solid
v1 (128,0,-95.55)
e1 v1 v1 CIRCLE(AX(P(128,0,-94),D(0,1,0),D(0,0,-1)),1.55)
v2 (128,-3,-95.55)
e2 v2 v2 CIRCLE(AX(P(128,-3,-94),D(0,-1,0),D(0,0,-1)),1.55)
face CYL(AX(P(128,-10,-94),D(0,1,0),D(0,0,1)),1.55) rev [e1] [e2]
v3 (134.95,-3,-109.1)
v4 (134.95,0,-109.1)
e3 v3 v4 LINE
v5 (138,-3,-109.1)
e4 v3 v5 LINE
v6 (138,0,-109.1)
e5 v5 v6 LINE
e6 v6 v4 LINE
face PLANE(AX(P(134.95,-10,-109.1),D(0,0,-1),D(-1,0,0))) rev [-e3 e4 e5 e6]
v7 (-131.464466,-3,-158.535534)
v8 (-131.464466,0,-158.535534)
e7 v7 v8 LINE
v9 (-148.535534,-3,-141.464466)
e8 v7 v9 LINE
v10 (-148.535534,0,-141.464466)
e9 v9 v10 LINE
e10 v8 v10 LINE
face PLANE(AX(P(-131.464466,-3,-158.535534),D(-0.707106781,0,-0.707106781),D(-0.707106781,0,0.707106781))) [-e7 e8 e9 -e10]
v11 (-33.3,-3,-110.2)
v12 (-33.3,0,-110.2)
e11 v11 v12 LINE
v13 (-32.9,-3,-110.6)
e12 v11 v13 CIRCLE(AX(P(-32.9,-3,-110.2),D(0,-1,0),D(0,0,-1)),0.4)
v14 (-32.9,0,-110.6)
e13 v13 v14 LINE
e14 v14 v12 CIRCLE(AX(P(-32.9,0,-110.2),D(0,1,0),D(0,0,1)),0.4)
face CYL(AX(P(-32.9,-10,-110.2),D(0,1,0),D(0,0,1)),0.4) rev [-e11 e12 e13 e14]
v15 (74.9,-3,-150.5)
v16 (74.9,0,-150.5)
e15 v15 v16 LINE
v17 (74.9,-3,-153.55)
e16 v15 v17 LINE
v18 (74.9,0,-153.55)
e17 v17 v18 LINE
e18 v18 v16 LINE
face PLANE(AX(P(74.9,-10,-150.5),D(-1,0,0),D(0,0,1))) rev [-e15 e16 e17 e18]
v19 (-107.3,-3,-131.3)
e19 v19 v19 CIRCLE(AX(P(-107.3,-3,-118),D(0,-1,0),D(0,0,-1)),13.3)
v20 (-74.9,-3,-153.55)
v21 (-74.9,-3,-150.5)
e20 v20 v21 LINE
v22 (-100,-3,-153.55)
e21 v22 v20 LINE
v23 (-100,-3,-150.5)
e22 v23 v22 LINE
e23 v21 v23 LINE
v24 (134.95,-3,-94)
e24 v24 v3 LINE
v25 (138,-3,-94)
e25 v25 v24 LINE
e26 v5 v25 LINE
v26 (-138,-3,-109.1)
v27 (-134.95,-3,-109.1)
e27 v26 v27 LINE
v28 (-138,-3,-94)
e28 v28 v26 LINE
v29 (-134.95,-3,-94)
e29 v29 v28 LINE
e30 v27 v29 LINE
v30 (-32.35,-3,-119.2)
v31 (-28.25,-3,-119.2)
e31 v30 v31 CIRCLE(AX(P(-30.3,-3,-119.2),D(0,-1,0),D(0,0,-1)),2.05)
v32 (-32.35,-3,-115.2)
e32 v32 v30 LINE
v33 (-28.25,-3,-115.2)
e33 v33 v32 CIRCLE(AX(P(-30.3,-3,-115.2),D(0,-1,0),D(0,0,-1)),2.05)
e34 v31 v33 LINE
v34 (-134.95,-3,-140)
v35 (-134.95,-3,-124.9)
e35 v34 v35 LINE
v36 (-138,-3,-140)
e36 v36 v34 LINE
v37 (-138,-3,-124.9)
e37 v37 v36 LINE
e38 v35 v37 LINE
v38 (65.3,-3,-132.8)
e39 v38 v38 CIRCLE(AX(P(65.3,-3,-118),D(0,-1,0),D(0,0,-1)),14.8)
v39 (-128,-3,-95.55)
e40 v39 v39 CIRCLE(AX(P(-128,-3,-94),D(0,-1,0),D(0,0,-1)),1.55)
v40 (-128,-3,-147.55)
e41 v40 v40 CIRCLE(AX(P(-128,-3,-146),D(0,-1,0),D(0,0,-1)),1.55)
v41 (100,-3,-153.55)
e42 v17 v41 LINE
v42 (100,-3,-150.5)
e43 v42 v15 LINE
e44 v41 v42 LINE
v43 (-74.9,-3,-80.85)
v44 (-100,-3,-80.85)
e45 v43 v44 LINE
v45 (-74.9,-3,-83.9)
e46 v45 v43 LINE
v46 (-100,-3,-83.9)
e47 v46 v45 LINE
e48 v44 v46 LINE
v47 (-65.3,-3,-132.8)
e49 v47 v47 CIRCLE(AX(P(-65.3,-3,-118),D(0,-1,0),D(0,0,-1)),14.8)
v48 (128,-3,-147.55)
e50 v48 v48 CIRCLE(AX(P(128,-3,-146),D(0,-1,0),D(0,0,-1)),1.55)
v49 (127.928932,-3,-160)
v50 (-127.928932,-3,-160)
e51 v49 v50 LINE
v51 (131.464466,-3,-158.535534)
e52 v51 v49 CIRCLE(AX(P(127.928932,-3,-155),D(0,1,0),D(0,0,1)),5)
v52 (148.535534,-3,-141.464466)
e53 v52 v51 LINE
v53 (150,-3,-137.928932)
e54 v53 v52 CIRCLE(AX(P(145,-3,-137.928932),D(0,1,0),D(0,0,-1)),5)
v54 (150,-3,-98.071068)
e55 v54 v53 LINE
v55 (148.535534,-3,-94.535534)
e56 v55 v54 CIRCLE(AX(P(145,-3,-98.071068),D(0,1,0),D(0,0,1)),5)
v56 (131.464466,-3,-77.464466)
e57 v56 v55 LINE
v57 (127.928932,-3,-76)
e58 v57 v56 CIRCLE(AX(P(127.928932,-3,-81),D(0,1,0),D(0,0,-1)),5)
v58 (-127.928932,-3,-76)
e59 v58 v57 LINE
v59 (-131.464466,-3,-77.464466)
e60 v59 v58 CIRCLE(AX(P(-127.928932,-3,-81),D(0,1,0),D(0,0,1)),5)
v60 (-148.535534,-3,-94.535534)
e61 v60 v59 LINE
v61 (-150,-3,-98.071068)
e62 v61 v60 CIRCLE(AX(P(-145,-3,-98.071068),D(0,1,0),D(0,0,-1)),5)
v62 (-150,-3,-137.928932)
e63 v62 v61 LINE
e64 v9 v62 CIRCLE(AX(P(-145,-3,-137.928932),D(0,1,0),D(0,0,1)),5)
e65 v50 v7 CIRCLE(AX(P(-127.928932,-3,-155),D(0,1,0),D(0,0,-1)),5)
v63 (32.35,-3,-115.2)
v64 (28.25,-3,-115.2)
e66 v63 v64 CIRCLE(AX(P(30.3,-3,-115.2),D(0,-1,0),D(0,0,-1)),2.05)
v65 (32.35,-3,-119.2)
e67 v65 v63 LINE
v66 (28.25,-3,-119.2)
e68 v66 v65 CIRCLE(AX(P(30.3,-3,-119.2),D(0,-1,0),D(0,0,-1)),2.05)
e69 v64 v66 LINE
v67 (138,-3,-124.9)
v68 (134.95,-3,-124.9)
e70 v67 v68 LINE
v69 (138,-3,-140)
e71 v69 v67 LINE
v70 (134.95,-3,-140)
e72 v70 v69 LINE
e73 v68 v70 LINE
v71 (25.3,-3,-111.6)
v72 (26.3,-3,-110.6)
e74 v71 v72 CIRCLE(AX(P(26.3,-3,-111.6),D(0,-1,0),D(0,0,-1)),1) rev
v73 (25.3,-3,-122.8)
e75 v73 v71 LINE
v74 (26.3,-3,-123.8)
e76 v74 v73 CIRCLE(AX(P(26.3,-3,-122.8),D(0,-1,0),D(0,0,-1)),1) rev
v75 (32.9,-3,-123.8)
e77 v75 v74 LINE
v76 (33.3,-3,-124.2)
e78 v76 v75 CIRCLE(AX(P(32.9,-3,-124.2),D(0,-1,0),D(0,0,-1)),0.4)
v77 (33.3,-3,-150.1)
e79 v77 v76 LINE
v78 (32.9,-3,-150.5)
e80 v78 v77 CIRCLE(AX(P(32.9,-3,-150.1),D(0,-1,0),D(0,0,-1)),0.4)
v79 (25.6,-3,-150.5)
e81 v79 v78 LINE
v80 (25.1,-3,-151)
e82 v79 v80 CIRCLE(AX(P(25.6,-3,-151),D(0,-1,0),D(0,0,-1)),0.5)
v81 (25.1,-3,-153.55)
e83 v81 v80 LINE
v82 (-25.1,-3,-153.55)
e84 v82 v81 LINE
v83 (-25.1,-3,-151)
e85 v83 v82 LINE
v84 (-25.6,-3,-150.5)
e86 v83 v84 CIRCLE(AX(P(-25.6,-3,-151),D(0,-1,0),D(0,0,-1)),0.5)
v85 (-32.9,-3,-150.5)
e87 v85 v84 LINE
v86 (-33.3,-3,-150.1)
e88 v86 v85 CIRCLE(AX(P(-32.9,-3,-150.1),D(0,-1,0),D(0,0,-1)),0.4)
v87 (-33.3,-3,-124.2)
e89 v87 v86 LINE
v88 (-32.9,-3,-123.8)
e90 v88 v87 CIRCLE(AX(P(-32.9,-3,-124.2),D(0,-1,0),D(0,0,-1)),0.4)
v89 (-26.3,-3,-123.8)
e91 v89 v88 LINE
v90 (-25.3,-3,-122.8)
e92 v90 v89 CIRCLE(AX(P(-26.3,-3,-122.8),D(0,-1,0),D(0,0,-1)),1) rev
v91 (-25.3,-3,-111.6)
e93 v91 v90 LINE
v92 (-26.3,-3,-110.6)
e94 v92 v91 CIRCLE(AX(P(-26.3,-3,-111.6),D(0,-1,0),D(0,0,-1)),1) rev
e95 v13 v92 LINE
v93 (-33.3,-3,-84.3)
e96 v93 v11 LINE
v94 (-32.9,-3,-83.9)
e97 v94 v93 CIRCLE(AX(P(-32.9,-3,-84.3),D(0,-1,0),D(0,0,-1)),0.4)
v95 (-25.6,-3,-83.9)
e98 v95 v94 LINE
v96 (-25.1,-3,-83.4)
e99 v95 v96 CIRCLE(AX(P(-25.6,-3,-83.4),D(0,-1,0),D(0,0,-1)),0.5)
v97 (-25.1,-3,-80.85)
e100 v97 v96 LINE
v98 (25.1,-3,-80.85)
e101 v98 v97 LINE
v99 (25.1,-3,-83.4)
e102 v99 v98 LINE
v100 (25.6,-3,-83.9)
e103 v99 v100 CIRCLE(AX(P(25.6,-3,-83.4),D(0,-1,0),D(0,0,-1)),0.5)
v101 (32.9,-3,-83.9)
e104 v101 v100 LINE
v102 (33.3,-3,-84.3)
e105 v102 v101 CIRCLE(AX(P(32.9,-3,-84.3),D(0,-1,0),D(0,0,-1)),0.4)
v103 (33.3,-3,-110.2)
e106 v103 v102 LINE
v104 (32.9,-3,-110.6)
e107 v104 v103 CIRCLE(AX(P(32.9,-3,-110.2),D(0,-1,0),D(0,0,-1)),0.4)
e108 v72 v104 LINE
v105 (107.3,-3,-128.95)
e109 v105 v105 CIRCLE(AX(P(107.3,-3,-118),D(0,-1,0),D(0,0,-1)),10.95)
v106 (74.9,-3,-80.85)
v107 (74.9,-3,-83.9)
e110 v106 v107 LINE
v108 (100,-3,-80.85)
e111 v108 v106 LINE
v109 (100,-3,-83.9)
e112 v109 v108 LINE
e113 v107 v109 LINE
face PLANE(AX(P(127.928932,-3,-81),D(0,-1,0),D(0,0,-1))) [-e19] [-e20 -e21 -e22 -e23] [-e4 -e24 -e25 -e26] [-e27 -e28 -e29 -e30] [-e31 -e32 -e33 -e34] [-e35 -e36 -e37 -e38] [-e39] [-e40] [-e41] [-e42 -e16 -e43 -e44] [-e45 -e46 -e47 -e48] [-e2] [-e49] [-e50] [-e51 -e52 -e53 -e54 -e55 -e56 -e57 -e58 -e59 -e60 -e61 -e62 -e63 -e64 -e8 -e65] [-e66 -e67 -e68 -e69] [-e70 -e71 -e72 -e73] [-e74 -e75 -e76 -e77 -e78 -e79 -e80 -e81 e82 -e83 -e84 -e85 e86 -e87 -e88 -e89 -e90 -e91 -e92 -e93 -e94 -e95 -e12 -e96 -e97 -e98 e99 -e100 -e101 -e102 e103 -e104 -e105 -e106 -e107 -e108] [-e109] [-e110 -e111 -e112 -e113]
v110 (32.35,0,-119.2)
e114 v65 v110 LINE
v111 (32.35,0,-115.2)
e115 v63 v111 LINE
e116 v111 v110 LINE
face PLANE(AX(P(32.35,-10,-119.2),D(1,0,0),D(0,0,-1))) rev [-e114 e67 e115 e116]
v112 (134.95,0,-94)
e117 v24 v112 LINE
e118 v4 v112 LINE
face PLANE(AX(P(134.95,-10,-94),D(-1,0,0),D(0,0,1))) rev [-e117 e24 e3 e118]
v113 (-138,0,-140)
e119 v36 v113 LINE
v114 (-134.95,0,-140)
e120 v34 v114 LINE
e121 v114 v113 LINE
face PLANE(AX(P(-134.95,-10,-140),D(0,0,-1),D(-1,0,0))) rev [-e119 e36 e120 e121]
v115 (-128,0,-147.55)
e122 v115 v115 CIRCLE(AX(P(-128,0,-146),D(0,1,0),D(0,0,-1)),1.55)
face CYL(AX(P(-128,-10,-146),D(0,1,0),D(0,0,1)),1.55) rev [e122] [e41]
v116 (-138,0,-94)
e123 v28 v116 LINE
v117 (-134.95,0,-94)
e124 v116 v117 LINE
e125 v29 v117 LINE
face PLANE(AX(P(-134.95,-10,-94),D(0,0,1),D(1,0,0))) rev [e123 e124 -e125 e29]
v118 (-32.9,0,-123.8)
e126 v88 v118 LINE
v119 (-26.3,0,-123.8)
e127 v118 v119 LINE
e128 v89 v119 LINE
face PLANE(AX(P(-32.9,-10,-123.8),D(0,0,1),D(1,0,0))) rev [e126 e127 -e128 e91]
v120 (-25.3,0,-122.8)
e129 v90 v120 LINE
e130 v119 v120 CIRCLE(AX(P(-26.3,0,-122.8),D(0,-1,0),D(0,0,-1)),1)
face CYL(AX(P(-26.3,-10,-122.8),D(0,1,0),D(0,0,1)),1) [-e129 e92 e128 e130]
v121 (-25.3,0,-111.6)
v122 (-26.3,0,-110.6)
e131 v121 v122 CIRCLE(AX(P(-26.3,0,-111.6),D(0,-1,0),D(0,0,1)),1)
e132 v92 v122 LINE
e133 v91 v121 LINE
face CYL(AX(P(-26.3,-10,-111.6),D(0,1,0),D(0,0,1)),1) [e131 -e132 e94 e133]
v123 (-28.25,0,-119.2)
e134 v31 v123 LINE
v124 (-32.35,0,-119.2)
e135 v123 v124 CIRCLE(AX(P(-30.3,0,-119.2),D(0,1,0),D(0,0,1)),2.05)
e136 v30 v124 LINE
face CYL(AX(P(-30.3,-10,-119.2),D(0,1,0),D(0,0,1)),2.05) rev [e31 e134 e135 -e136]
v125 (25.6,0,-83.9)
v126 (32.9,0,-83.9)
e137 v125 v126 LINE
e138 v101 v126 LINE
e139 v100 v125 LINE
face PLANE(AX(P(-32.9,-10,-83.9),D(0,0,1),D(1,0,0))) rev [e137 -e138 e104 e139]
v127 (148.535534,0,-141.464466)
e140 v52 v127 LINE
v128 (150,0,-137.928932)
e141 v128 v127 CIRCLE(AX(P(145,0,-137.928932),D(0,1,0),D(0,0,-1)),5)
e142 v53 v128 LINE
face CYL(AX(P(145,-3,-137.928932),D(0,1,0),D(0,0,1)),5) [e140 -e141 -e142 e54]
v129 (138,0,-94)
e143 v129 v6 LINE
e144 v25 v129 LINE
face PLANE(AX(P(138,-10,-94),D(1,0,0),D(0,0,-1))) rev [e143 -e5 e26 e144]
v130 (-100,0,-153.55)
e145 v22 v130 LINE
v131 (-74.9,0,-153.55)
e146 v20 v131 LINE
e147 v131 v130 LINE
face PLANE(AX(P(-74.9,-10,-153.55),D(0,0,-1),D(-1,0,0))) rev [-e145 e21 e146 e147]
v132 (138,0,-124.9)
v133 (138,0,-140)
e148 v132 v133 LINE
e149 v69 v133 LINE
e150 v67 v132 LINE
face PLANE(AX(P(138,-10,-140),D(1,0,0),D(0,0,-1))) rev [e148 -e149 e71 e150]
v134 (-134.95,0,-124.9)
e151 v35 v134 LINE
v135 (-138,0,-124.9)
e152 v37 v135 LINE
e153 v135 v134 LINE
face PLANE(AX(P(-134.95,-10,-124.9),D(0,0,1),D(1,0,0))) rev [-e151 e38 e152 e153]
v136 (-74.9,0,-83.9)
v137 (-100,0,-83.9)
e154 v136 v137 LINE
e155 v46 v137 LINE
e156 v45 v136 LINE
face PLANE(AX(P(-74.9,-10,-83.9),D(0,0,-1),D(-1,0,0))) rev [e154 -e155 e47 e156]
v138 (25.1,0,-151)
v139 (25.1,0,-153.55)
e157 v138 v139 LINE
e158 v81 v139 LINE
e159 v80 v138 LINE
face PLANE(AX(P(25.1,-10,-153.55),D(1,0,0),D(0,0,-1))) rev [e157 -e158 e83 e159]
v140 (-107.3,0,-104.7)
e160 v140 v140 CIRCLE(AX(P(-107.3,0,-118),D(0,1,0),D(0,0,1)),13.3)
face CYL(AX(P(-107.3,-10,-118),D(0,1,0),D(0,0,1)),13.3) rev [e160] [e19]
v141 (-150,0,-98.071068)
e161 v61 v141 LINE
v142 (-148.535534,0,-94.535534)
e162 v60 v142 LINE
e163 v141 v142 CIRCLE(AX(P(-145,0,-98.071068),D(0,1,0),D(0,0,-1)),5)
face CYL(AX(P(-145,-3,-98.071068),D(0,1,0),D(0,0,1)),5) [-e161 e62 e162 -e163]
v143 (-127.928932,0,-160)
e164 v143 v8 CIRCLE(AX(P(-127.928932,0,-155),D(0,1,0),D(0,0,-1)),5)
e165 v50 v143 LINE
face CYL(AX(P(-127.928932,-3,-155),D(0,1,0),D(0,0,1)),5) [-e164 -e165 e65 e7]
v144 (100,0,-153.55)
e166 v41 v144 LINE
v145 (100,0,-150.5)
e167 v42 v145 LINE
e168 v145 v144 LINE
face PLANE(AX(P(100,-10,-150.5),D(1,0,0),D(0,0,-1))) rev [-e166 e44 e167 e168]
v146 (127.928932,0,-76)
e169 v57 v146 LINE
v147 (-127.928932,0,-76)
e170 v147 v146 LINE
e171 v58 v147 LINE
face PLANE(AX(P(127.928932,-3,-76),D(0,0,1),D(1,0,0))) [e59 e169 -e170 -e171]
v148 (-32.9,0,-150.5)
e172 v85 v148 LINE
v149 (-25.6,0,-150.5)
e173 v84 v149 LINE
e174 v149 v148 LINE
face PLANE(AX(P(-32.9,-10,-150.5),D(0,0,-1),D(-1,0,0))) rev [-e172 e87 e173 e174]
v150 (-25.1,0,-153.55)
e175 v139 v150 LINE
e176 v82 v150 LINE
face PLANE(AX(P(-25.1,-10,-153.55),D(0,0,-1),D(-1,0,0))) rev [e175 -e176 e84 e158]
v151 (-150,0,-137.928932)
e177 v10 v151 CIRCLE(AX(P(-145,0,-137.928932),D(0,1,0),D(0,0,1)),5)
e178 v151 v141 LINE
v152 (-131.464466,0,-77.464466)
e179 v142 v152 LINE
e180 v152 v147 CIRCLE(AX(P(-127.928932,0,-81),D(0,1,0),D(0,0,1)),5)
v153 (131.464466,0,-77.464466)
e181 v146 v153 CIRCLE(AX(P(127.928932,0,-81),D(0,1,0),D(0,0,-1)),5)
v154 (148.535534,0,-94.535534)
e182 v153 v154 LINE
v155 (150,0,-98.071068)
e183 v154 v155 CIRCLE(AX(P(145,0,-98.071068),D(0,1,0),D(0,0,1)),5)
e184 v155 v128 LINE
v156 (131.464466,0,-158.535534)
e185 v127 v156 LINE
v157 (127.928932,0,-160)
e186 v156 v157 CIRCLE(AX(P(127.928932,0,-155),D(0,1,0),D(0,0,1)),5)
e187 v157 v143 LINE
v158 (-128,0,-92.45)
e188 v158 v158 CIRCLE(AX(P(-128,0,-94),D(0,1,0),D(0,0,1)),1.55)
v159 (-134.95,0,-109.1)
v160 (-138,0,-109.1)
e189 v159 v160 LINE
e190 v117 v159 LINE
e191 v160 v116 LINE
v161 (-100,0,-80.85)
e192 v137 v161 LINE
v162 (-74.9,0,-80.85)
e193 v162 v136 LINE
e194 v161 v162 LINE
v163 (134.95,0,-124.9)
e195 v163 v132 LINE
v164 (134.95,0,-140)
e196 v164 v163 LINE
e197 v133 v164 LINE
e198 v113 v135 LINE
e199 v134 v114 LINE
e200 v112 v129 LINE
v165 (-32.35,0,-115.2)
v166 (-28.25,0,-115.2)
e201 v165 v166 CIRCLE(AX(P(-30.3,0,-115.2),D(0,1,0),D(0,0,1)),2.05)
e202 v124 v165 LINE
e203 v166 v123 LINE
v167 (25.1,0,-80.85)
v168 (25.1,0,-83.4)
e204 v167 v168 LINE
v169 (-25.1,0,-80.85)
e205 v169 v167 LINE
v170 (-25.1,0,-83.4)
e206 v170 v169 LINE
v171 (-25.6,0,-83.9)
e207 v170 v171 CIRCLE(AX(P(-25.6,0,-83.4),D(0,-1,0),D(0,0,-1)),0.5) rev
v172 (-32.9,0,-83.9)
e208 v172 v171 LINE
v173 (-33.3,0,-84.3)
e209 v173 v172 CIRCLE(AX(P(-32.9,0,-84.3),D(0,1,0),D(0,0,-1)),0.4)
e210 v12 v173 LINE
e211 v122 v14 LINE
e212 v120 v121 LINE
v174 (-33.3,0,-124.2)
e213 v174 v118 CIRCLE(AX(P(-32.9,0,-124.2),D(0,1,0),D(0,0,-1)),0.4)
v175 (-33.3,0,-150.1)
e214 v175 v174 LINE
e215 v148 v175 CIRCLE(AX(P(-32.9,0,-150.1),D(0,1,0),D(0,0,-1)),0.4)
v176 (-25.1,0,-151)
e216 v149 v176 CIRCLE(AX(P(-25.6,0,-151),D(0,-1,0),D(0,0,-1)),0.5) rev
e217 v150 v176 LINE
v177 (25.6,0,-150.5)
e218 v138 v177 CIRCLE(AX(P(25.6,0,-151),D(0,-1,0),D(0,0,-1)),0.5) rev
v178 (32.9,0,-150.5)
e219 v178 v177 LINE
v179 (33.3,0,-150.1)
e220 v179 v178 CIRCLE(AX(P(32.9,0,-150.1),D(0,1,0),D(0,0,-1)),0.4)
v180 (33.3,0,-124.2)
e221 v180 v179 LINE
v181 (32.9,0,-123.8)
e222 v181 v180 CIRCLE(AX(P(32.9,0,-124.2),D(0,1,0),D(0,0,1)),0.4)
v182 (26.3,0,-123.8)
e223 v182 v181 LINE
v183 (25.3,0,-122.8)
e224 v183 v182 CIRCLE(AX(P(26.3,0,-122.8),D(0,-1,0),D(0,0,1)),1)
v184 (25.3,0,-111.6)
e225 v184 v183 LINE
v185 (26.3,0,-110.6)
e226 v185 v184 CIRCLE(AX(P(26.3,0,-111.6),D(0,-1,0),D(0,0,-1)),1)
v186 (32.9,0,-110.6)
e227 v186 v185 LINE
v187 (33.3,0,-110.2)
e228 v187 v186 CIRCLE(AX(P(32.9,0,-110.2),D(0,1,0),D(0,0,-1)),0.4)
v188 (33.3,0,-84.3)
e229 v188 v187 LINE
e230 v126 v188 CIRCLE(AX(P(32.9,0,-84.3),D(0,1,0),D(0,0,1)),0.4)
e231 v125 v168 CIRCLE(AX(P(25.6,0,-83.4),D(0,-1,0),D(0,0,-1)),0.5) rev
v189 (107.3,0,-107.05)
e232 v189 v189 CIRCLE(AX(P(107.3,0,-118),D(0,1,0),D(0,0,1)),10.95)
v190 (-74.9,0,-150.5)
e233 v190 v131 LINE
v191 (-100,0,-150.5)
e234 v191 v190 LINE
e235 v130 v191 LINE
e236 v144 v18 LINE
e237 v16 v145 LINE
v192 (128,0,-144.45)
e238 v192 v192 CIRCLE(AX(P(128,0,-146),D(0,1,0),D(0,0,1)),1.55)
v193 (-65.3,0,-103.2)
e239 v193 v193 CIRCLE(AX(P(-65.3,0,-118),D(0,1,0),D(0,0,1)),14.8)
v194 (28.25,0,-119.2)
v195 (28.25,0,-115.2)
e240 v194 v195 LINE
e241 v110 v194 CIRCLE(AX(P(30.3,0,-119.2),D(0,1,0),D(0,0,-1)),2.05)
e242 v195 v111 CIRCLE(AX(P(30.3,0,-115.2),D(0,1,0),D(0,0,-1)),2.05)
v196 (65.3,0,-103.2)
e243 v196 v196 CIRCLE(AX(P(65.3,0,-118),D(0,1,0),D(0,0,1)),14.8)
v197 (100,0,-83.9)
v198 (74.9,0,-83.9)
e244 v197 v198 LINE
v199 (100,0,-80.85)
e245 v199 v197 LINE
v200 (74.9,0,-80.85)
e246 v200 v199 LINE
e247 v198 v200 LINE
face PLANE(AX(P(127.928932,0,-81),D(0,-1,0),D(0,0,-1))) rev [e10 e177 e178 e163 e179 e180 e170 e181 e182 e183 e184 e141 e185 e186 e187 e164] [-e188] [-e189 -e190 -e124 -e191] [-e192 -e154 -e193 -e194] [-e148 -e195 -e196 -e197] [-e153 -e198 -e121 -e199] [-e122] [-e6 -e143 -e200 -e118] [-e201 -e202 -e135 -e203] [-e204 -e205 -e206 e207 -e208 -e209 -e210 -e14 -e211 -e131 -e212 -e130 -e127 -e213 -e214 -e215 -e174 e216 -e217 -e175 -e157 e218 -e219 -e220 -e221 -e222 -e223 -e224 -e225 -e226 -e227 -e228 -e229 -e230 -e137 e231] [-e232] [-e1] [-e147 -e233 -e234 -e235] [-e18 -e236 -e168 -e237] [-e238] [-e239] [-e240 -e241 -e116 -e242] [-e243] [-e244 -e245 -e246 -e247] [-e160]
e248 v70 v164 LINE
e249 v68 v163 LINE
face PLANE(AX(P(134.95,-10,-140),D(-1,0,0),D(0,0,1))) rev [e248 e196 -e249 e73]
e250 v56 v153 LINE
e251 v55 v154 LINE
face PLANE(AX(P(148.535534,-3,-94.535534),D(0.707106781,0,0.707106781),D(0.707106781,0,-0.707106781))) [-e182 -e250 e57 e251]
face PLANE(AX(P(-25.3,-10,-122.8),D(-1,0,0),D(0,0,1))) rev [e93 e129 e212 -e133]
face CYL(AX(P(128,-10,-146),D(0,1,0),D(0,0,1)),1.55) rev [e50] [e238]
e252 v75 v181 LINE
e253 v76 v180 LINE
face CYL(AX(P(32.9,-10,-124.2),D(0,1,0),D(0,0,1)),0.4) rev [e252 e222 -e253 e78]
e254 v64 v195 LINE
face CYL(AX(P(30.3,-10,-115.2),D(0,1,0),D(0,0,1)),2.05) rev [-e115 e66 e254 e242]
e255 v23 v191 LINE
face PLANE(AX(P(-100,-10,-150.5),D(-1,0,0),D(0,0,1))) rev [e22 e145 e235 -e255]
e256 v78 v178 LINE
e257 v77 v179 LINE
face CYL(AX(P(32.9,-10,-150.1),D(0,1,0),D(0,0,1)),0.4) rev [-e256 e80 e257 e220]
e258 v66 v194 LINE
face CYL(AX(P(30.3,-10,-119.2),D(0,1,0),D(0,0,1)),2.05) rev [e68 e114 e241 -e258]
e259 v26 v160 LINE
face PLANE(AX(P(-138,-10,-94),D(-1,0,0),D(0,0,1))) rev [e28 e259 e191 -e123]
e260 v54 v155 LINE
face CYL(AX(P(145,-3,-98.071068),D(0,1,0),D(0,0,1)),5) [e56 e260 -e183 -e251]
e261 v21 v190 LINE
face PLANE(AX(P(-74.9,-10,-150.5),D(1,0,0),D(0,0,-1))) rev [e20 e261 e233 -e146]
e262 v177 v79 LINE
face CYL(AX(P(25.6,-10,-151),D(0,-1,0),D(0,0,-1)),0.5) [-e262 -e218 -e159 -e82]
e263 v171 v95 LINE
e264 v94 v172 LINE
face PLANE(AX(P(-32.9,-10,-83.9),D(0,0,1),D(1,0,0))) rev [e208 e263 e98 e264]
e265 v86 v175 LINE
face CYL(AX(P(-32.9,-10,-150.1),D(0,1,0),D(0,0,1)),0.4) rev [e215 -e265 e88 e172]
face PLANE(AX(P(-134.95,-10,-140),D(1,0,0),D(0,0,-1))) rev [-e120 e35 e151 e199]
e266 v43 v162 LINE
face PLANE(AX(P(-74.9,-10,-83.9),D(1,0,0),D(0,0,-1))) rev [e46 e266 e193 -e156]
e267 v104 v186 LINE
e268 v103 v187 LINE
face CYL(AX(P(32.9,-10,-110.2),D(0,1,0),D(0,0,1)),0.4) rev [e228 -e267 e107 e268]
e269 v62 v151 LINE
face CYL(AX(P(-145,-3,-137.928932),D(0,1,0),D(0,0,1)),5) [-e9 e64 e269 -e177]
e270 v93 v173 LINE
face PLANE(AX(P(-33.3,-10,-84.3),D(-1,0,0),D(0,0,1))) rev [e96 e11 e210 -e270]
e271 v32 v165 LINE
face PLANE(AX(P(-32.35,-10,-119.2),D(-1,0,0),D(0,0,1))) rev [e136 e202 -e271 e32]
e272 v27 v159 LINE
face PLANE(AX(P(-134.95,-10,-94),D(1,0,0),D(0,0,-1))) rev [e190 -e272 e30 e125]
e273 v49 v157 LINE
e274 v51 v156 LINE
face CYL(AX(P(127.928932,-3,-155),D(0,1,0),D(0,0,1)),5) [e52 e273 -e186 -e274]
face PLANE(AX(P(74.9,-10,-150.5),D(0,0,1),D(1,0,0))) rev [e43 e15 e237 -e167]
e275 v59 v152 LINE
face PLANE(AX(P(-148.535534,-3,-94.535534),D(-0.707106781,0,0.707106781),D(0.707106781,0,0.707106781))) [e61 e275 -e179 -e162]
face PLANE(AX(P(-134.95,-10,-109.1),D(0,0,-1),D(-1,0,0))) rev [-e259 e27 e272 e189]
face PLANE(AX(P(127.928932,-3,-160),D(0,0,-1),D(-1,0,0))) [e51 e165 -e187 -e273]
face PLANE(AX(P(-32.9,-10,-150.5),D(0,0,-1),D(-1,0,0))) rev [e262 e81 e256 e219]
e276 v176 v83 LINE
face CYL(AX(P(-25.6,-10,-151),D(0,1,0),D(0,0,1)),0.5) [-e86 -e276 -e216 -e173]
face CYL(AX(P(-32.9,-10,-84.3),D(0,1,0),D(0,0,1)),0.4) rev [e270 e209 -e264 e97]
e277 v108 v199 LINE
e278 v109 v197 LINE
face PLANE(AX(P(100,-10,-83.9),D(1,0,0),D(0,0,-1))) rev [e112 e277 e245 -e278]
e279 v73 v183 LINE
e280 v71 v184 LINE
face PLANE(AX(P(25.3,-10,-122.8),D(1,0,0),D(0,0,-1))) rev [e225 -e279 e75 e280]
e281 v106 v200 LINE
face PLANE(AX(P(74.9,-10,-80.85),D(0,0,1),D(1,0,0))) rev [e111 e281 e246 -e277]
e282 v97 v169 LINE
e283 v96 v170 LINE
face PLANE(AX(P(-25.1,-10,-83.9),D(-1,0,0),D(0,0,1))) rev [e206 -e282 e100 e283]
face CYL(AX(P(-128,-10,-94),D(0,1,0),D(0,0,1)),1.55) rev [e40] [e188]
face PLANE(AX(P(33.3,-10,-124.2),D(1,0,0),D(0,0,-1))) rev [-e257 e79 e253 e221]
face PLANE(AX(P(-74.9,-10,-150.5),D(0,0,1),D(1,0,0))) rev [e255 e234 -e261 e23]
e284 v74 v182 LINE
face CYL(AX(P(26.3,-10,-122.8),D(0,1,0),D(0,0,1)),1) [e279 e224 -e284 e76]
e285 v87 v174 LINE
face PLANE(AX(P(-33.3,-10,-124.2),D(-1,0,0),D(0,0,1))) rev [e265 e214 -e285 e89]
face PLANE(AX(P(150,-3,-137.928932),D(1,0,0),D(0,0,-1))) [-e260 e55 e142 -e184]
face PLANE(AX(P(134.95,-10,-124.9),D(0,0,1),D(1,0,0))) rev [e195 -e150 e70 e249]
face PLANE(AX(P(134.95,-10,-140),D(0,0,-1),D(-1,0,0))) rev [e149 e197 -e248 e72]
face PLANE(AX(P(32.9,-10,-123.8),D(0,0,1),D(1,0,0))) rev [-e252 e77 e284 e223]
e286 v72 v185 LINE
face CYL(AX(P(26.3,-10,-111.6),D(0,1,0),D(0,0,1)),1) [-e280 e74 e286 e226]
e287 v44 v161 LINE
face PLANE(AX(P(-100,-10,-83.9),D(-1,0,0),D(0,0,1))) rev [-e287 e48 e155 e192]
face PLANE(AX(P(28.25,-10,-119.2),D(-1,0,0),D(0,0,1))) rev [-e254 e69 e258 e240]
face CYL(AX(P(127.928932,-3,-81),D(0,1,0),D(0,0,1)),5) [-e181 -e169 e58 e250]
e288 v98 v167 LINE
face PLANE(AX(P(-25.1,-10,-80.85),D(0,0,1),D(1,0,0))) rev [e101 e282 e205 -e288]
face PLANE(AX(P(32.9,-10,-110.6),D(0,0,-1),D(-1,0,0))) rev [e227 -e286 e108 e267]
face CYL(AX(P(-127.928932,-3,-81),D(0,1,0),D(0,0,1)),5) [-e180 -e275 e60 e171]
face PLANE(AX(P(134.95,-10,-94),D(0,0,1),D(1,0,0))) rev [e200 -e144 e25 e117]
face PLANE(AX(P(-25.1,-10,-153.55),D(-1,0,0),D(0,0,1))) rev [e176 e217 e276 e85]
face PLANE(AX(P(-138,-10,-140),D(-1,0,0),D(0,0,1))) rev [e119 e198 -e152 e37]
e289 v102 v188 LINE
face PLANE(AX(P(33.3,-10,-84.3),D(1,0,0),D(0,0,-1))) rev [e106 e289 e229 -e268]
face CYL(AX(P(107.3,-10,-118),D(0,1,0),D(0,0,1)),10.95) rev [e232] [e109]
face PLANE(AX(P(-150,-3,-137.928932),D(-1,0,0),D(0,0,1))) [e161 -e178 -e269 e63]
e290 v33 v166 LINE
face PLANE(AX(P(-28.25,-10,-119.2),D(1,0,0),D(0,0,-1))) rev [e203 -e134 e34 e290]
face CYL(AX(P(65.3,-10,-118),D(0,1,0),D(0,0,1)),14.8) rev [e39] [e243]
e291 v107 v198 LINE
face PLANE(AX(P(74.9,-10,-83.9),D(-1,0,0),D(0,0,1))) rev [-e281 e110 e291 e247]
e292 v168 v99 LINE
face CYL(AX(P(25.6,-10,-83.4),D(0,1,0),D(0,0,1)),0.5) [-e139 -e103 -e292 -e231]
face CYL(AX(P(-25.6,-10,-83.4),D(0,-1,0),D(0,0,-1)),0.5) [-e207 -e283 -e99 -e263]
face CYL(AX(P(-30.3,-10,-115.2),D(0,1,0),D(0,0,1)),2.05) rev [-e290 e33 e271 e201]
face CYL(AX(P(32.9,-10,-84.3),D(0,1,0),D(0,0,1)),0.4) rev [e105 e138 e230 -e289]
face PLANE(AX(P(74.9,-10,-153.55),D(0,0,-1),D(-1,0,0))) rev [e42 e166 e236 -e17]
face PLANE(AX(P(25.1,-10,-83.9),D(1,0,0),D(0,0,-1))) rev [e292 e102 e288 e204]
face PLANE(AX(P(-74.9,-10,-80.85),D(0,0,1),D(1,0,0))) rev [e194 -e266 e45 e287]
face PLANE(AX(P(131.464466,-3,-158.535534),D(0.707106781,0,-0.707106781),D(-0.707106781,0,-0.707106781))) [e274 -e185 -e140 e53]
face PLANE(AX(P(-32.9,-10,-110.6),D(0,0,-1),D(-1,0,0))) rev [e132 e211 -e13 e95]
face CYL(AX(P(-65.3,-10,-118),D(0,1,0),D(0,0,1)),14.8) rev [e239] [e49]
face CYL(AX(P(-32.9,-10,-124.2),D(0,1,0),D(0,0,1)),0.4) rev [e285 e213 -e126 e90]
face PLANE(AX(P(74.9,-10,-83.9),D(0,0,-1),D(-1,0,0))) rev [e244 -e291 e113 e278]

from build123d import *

# Parameters (mm, degrees)
BASE_FLANGE1_START = -3
BASE_FLANGE1_DEPTH = 3
SKETCH6_R          = 1.55
CUT_EXTRUDE1_DEPTH = 10
SKETCH7_R          = 1.55
CUT_EXTRUDE2_DEPTH = 10
SKETCH9_R          = 14.8
SKETCH9_R_2        = 13.3
SKETCH9_R_3        = 10.95
CUT_EXTRUDE4_DEPTH = 10
SKETCH8_W          = 50.2
SKETCH8_H          = 3.05
SKETCH8_W_2        = 25.1
SKETCH8_W_3        = 3.05
SKETCH8_H_2        = 15.1
CUT_EXTRUDE5_DEPTH = 10
FILLET2_R          = 0.5


# Read off the part's stored shape, not the designer's step: Base-Flange1
with BuildPart() as part:
    # Base-Flange1 outline → Base-Flange1 (new body)
    with BuildSketch(Plane(origin=(0, 0, 0), x_dir=(1, 0, 0), z_dir=(0, 1, 0)).offset(BASE_FLANGE1_START)):
        with BuildLine():
            Line((-127.928932188, 76), (127.928932188, 76))
            ThreePointArc((127.928932188, 76), (129.84234935, 76.380602337), (131.464466094, 77.464466094))
            Line((131.464466094, 77.464466094), (148.535533906, 94.535533906))
            ThreePointArc((148.535533906, 94.535533906), (149.619397663, 96.15765065), (150, 98.071067812))
            Line((150, 98.071067812), (150, 137.928932188))
            ThreePointArc((150, 137.928932188), (149.619397663, 139.84234935), (148.535533906, 141.464466094))
            Line((148.535533906, 141.464466094), (131.464466094, 158.535533906))
            ThreePointArc((131.464466094, 158.535533906), (129.84234935, 159.619397663), (127.928932188, 160))
            Line((127.928932188, 160), (-127.928932188, 160))
            ThreePointArc((-127.928932188, 160), (-129.84234935, 159.619397663), (-131.464466094, 158.535533906))
            Line((-131.464466094, 158.535533906), (-148.535533906, 141.464466094))
            ThreePointArc((-148.535533906, 141.464466094), (-149.619397663, 139.84234935), (-150, 137.928932188))
            Line((-150, 137.928932188), (-150, 98.071067812))
            ThreePointArc((-150, 98.071067812), (-149.619397663, 96.15765065), (-148.535533906, 94.535533906))
            Line((-148.535533906, 94.535533906), (-131.464466094, 77.464466094))
            ThreePointArc((-131.464466094, 77.464466094), (-129.84234935, 76.380602337), (-127.928932188, 76))
        make_face()
    extrude(amount=BASE_FLANGE1_DEPTH)

    # Sketch6 → Cut-Extrude1 (cut)
    with BuildSketch(Plane(origin=(0, 0, 0), x_dir=(1, 0, 0), z_dir=(0, 1, 0))):
        with Locations(Location((128, 146, 0), (0, 0, 270))):
            Circle(SKETCH6_R)
        with Locations(Location((-128, 146, 0), (0, 0, 90))):
            Circle(SKETCH6_R)
    extrude(amount=-CUT_EXTRUDE1_DEPTH, mode=Mode.SUBTRACT)

    # Sketch7 → Cut-Extrude2 (cut)
    with BuildSketch(Plane(origin=(0, 0, 0), x_dir=(1, 0, 0), z_dir=(0, 1, 0))):
        with Locations(Location((-128, 94, 0), (0, 0, 270))):
            Circle(SKETCH7_R)
        with Locations(Location((128, 94, 0), (0, 0, 90))):
            Circle(SKETCH7_R)
    extrude(amount=-CUT_EXTRUDE2_DEPTH, mode=Mode.SUBTRACT)

    # Sketch9 → Cut-Extrude4 (cut)
    with BuildSketch(Plane(origin=(0, 0, 0), x_dir=(1, 0, 0), z_dir=(0, 1, 0))):
        with Locations(Location((-65.3, 118, 0), (0, 0, 270))):
            Circle(SKETCH9_R)
        with Locations(Location((65.3, 118, 0), (0, 0, 270))):
            Circle(SKETCH9_R)
        with Locations(Location((-107.3, 118, 0), (0, 0, 270))):
            Circle(SKETCH9_R_2)
        with Locations(Location((107.3, 118, 0), (0, 0, 270))):
            Circle(SKETCH9_R_3)
        with BuildLine():
            Line((-32.9, 83.9), (32.9, 83.9))
            ThreePointArc((32.9, 83.9), (33.182842712, 84.017157288), (33.3, 84.3))
            Line((33.3, 84.3), (33.3, 110.2))
            ThreePointArc((33.3, 110.2), (33.182842712, 110.482842712), (32.9, 110.6))
            Line((32.9, 110.6), (26.3, 110.6))
            ThreePointArc((26.3, 110.6), (25.592893219, 110.892893219), (25.3, 111.6))
            Line((25.3, 111.6), (25.3, 122.8))
            ThreePointArc((25.3, 122.8), (25.592893219, 123.507106781), (26.3, 123.8))
            Line((26.3, 123.8), (32.9, 123.8))
            ThreePointArc((32.9, 123.8), (33.182842712, 123.917157288), (33.3, 124.2))
            Line((33.3, 124.2), (33.3, 150.1))
            ThreePointArc((33.3, 150.1), (33.182842712, 150.382842712), (32.9, 150.5))
            Line((32.9, 150.5), (-32.9, 150.5))
            ThreePointArc((-32.9, 150.5), (-33.182842712, 150.382842712), (-33.3, 150.1))
            Line((-33.3, 150.1), (-33.3, 124.2))
            ThreePointArc((-33.3, 124.2), (-33.182842712, 123.917157288), (-32.9, 123.8))
            Line((-32.9, 123.8), (-26.3, 123.8))
            ThreePointArc((-26.3, 123.8), (-25.592893219, 123.507106781), (-25.3, 122.8))
            Line((-25.3, 122.8), (-25.3, 111.6))
            ThreePointArc((-25.3, 111.6), (-25.592893219, 110.892893219), (-26.3, 110.6))
            Line((-26.3, 110.6), (-32.9, 110.6))
            ThreePointArc((-32.9, 110.6), (-33.182842712, 110.482842712), (-33.3, 110.2))
            Line((-33.3, 110.2), (-33.3, 84.3))
            ThreePointArc((-33.3, 84.3), (-33.182842712, 84.017157288), (-32.9, 83.9))
        make_face()
        with BuildLine():
            Line((-28.25, 119.2), (-28.25, 115.2))
            ThreePointArc((-28.25, 115.2), (-30.3, 113.15), (-32.35, 115.2))
            Line((-32.35, 115.2), (-32.35, 119.2))
            ThreePointArc((-32.35, 119.2), (-30.3, 121.25), (-28.25, 119.2))
        make_face()
        with BuildLine():
            Line((28.25, 119.2), (28.25, 115.2))
            ThreePointArc((28.25, 115.2), (30.3, 113.15), (32.35, 115.2))
            Line((32.35, 115.2), (32.35, 119.2))
            ThreePointArc((32.35, 119.2), (30.3, 121.25), (28.25, 119.2))
        make_face()
    extrude(amount=-CUT_EXTRUDE4_DEPTH, mode=Mode.SUBTRACT)

    # Sketch8 → Cut-Extrude5 (cut)
    with BuildSketch(Plane(origin=(0, 0, 0), x_dir=(1, 0, 0), z_dir=(0, 1, 0))):
        with Locations((0, 82.375)):
            Rectangle(SKETCH8_W, SKETCH8_H)
        with Locations((87.45, 82.375)):
            Rectangle(SKETCH8_W_2, SKETCH8_H)
        with Locations((136.475, 132.45)):
            Rectangle(SKETCH8_W_3, SKETCH8_H_2)
        with Locations((0, 152.025)):
            Rectangle(SKETCH8_W, SKETCH8_H)
        with Locations((87.45, 152.025)):
            Rectangle(SKETCH8_W_2, SKETCH8_H)
        with Locations((-87.45, 152.025)):
            Rectangle(SKETCH8_W_2, SKETCH8_H)
        with Locations((136.475, 101.55)):
            Rectangle(SKETCH8_W_3, SKETCH8_H_2)
        with Locations((-87.45, 82.375)):
            Rectangle(SKETCH8_W_2, SKETCH8_H)
        with Locations((-136.475, 101.55)):
            Rectangle(SKETCH8_W_3, SKETCH8_H_2)
        with Locations((-136.475, 132.45)):
            Rectangle(SKETCH8_W_3, SKETCH8_H_2)
    extrude(amount=-CUT_EXTRUDE5_DEPTH, mode=Mode.SUBTRACT)

    # Fillet2
    fillet2_edges = [part.edges().sort_by_distance(p)[0] for p in [
        (-25.1, -1.5, -150.5),
        (25.1, -1.5, -150.5),
        (-25.1, -1.5, -83.9),
        (25.1, -1.5, -83.9),
    ]]
    fillet(fillet2_edges, radius=FILLET2_R)


solid = part.part
